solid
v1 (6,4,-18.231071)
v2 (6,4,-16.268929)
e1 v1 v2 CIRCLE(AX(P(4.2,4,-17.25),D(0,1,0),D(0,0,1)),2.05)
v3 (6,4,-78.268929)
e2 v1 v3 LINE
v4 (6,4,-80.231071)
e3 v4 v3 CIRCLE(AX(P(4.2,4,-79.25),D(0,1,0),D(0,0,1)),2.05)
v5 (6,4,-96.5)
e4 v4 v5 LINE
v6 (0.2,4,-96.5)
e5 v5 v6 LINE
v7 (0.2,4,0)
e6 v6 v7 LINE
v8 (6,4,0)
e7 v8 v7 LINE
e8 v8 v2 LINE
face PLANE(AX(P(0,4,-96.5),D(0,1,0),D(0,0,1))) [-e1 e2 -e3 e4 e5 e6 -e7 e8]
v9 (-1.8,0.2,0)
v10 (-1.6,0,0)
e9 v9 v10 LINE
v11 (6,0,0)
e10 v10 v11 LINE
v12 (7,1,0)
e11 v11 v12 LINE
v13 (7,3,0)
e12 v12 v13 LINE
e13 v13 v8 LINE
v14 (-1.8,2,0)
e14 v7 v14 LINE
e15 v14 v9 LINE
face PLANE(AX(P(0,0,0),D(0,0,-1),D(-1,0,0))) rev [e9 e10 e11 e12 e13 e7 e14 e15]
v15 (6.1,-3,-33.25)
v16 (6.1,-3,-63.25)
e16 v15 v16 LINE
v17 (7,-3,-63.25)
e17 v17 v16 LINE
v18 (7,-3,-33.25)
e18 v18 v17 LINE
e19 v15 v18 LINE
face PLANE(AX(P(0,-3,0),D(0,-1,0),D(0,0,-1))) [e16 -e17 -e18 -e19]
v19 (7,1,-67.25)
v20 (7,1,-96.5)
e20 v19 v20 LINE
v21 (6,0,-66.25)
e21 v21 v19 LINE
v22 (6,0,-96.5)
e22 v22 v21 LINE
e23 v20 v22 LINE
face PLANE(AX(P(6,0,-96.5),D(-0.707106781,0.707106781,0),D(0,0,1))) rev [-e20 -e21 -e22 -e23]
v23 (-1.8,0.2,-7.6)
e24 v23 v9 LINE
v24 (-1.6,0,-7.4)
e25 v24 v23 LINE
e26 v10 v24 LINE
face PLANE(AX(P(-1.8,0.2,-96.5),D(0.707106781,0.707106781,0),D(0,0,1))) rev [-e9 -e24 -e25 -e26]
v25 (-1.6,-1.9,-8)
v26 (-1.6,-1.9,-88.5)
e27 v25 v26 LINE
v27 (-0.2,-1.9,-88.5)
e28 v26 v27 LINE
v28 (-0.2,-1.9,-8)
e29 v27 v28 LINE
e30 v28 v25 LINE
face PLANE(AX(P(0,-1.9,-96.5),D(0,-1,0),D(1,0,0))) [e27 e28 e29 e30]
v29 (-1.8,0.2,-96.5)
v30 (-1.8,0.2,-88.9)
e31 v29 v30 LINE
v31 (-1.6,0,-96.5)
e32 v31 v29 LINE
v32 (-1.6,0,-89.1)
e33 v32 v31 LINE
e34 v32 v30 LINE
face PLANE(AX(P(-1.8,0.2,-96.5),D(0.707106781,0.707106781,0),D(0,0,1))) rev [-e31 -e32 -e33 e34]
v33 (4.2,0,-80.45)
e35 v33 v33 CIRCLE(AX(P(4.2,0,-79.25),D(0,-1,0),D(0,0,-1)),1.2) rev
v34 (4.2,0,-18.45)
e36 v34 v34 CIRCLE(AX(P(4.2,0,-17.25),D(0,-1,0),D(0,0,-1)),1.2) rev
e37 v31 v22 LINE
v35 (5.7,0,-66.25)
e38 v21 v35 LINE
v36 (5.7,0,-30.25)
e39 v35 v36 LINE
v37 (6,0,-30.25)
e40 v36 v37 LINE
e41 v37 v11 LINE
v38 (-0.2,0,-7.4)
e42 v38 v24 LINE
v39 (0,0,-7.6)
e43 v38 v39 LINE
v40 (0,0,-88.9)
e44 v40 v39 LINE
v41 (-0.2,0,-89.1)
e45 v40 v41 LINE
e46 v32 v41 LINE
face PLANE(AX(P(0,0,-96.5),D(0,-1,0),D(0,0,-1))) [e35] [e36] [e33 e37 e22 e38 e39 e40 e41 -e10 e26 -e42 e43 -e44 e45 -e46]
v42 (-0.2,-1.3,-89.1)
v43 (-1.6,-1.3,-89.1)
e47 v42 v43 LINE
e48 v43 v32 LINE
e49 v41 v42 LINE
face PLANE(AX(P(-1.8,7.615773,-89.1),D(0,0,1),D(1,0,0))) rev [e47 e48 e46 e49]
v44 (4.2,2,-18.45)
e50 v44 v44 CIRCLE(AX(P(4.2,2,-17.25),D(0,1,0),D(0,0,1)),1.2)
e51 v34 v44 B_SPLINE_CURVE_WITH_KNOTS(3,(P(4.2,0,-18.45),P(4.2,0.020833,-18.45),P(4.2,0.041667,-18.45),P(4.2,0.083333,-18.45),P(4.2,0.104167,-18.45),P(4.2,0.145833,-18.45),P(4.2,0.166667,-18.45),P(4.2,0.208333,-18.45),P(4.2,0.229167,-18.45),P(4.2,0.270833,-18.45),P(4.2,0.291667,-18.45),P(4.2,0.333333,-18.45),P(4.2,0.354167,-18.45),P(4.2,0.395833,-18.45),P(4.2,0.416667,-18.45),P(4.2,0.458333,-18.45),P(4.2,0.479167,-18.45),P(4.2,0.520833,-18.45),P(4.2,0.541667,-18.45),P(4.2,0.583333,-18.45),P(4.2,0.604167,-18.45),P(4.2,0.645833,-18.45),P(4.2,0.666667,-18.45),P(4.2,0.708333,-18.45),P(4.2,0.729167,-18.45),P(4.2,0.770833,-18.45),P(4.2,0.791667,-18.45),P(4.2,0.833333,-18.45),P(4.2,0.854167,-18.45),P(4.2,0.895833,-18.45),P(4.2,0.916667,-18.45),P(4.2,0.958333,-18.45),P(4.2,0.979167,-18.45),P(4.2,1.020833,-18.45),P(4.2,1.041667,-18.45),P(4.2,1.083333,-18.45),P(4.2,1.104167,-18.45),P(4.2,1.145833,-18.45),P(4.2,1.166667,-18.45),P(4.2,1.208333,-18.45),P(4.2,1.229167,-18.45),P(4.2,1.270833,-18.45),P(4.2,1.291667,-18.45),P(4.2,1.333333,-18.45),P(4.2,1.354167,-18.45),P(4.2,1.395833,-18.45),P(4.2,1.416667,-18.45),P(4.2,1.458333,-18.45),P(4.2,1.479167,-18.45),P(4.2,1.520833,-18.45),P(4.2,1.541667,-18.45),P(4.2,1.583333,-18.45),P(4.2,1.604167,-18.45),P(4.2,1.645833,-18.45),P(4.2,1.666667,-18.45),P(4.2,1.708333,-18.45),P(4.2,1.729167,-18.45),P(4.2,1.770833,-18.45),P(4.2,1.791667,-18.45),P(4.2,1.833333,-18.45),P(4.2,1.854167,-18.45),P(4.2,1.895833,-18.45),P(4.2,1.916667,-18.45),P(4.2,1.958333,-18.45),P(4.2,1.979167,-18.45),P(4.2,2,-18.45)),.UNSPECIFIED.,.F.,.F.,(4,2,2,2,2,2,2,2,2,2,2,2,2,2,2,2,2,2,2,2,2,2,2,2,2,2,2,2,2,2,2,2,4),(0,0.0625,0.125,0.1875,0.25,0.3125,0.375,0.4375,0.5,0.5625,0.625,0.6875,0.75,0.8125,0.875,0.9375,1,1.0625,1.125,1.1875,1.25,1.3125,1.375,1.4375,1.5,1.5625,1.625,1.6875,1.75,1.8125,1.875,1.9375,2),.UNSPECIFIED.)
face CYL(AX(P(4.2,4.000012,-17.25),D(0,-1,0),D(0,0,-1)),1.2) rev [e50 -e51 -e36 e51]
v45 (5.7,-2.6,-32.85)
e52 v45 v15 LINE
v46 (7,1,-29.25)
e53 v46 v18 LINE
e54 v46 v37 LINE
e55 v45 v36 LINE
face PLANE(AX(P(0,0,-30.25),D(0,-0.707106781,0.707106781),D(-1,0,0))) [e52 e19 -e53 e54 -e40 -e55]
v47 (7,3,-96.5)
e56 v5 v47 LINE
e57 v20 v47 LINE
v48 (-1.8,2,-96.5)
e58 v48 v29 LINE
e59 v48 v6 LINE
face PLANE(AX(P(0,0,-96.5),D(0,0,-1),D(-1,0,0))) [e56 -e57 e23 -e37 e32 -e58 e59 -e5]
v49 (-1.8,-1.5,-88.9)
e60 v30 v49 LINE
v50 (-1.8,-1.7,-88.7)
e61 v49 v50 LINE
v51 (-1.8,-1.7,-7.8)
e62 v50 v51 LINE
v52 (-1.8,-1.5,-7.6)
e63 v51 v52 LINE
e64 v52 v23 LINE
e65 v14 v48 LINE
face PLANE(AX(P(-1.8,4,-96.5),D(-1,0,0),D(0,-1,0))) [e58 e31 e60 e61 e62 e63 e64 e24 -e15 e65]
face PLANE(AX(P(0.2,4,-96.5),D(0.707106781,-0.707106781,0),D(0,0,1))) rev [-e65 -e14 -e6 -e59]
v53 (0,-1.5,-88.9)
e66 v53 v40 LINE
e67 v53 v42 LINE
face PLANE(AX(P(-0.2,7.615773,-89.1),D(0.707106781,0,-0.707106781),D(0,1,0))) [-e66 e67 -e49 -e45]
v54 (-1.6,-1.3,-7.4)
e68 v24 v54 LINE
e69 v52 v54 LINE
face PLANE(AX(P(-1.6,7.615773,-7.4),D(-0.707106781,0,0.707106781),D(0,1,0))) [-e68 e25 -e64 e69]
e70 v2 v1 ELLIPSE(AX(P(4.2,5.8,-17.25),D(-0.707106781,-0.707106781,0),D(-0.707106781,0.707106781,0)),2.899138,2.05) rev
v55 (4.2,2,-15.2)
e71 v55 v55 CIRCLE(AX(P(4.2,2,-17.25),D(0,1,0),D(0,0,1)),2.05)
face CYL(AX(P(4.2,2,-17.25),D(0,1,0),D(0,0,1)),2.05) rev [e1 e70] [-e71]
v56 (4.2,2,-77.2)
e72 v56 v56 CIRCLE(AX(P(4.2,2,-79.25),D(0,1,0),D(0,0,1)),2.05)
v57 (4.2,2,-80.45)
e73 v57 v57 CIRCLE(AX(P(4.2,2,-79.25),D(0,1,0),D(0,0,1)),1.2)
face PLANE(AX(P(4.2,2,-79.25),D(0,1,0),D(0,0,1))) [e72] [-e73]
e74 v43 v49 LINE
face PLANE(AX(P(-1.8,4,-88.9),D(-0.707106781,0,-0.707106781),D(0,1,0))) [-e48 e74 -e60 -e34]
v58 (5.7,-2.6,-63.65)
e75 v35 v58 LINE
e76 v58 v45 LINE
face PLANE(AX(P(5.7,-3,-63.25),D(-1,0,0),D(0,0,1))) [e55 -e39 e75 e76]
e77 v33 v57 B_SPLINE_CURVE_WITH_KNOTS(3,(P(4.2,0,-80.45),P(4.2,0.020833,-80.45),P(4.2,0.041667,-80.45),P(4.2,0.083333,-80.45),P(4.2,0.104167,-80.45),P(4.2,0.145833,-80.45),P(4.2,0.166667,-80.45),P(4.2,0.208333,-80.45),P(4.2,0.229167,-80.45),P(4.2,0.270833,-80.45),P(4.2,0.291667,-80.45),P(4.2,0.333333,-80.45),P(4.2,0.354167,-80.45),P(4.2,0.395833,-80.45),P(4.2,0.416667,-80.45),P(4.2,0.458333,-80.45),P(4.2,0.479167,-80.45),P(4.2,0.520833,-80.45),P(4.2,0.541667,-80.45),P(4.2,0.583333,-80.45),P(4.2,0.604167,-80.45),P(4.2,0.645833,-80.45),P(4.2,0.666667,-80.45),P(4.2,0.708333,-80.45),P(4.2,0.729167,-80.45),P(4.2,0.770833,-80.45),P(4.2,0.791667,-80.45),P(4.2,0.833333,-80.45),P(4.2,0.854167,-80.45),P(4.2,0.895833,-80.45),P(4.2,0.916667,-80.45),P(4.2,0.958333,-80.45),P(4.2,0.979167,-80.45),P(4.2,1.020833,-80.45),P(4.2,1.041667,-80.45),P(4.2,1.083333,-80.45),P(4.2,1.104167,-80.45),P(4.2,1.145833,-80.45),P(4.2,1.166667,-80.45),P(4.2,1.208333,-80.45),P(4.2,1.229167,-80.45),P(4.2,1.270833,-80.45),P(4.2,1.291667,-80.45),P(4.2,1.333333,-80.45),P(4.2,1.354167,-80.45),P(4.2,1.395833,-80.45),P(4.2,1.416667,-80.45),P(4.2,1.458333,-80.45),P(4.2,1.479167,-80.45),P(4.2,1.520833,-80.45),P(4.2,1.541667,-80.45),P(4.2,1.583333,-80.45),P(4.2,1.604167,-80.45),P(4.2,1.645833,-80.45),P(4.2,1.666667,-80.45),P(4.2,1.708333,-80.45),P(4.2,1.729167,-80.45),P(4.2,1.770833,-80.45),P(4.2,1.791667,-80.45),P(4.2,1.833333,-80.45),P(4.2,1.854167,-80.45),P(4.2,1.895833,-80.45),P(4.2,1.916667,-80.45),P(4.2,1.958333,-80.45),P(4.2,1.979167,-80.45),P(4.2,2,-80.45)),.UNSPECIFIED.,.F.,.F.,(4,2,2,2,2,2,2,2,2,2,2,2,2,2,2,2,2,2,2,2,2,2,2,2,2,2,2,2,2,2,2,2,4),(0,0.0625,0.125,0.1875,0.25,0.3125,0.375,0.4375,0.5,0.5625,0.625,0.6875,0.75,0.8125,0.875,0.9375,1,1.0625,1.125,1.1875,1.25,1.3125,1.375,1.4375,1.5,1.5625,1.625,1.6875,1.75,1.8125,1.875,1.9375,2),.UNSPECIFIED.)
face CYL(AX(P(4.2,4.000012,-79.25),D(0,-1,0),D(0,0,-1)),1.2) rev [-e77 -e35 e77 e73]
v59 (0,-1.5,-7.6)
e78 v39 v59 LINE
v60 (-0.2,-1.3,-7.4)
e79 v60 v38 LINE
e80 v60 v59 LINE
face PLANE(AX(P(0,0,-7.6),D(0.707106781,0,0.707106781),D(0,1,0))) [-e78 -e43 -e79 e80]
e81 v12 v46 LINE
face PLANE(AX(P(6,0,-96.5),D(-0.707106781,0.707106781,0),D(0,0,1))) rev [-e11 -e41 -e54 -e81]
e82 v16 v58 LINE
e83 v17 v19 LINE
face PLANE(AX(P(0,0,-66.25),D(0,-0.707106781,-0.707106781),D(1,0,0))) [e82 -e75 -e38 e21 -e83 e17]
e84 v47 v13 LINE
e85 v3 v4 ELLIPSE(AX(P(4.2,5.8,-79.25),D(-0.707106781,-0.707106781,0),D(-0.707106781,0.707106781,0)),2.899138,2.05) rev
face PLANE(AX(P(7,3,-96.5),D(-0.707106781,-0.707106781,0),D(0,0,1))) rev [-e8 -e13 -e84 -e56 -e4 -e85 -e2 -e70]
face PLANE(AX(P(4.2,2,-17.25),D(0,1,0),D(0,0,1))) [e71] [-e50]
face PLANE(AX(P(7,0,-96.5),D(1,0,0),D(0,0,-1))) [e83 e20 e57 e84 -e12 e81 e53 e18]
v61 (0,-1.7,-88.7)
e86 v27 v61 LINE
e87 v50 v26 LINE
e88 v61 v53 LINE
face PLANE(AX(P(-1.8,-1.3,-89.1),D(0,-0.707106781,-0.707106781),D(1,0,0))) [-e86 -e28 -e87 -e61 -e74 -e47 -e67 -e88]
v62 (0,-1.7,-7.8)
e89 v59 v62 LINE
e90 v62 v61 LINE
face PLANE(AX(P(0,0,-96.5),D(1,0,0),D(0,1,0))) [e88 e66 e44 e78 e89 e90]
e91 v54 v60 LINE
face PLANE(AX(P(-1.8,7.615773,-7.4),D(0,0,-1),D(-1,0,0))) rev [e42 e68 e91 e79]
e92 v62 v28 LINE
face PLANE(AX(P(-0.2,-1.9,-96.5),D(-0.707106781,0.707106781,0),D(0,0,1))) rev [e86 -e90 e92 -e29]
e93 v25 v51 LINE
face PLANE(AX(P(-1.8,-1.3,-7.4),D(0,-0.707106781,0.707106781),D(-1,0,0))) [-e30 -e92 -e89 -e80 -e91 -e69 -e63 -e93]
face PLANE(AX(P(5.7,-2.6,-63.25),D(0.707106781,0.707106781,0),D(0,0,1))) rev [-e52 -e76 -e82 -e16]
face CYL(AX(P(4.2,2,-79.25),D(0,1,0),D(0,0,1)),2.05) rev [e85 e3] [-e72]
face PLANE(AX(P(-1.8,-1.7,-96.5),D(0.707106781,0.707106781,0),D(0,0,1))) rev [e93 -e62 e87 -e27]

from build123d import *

# Parameters (mm, degrees)
EXTRUDE_1_DEPTH          = 96.5
CUT_EXTRUDE_1_DEPTH      = 97.93327602
CUT_EXTRUDE_1_DEPTH_BACK = 10
SKETCH_2_R               = 1.2
SKETCH_2_3_R             = 2.05
CUT_EXTRUDE_2_DEPTH      = 2
CHAMFER_3_SIZE           = 2
SKETCH_3_W               = 1.8
SKETCH_3_H               = 7.4
CUT_EXTRUDE_3_DEPTH      = 1.9
CHAMFER_4_SIZE           = 0.2
CHAMFER_5_SIZE           = 0.6
CHAMFER_2_SIZE           = 1
SKETCH_4_W               = 1.3
SKETCH_4_H               = 30
EXTRUDE_2_DEPTH          = 3
CHAMFER_6_SIZE           = 3
CHAMFER_1_SIZE           = 1
CHAMFER_7_SIZE           = 0.4


# Some blends are built 0.0001 mm under size
with BuildPart() as part:
    # 草图1 → 凸台-拉伸1 (new body)
    with BuildSketch(Plane.XY):
        Polygon((0, 0), (7, 0), (7, 4), (0, 4), (-1.8, 4), (-1.8, -1.9), (0, -1.9), align=None)
    extrude(amount=-EXTRUDE_1_DEPTH)

    # 草图2 → 切除-拉伸1 (cut, two sides: drawn at the far end of the back side and taken through both)
    with BuildSketch(Plane(origin=(0, 4, 0), x_dir=(1, 0, 0), z_dir=(0, 1, 0)).offset(-CUT_EXTRUDE_1_DEPTH_BACK)):
        with Locations(Location((4.2, 79.25, 0), (0, 0, 90))):
            Circle(SKETCH_2_R)
        with Locations(Location((4.2, 17.25, 0), (0, 0, 90))):
            Circle(SKETCH_2_R)
    extrude(amount=CUT_EXTRUDE_1_DEPTH + CUT_EXTRUDE_1_DEPTH_BACK, mode=Mode.SUBTRACT)

    # 草图2<3> → 切除-拉伸2 (cut)
    with BuildSketch(Plane(origin=(0, 4, 0), x_dir=(1, 0, 0), z_dir=(0, 1, 0))):
        with Locations(Location((4.2, 79.25, 0), (0, 0, 270))):
            Circle(SKETCH_2_3_R)
        with Locations(Location((4.2, 17.25, 0), (0, 0, 270))):
            Circle(SKETCH_2_3_R)
    extrude(amount=-CUT_EXTRUDE_2_DEPTH, mode=Mode.SUBTRACT)

    # 倒角3
    chamfer_3_edges = [part.edges().sort_by_distance(p)[0] for p in [
        (-1.8, 4, -48.25),
    ]]
    chamfer(chamfer_3_edges, length=CHAMFER_3_SIZE)

    # 草图3 → 切除-拉伸3 (cut)
    with BuildSketch(Plane.XZ.offset(1.9)):
        with Locations((-0.9, -92.8)):
            Rectangle(SKETCH_3_W, SKETCH_3_H)
        with Locations((-0.9, -3.7)):
            Rectangle(SKETCH_3_W, SKETCH_3_H)
    extrude(amount=-CUT_EXTRUDE_3_DEPTH, mode=Mode.SUBTRACT)

    # 倒角4
    chamfer_4_edges = [part.edges().sort_by_distance(p)[0] for p in [
        (-1.8, -1.9, -48.25),
        (0, -1.9, -48.25),
        (-1.8, -0.95, -89.1),
        (0, -0.95, -89.1),
        (-1.8, 0, -92.8),
        (-1.8, -0.95, -7.4),
        (0, -0.95, -7.4),
        (-1.8, 0, -3.7),
    ]]
    chamfer(chamfer_4_edges, length=CHAMFER_4_SIZE)

    # 倒角5
    # the kernel refuses this chamfer: 0.6 mm, written as the material it takes off along each edge
    with BuildSketch(Plane(origin=(1.343009793, -1.9, -89.1), x_dir=(0, 0.9996219169112965, -0.027495876610595982), z_dir=(-1, 0, 0))) as chamfer_5_piece_1:
        Polygon((CHAMFER_5_SIZE * 0.999621916911, -CHAMFER_5_SIZE * 0.0274958766106), (-CHAMFER_5_SIZE * 0.0274958766106, -CHAMFER_5_SIZE * 0.999621916911), (0, 0), align=None)
    extrude(amount=4.486019586, mode=Mode.SUBTRACT)
    with BuildSketch(Plane(origin=(1.343009793, -1.9, -7.4), x_dir=(0, 0.9996219169112968, 0.027495876610585925), z_dir=(-1, 0, 0))) as chamfer_5_piece_2:
        Polygon((CHAMFER_5_SIZE * 0.999621916911, CHAMFER_5_SIZE * 0.0274958766106), (-CHAMFER_5_SIZE * 0.0274958766106, CHAMFER_5_SIZE * 0.999621916911), (0, 0), align=None)
    extrude(amount=4.486019586, mode=Mode.SUBTRACT)

    # 倒角2
    # the kernel refuses this chamfer: 1 mm, written as the material it takes off along each edge
    with BuildSketch(Plane(origin=(7, 4, 2.571682988), x_dir=(-0.9996219169112968, 0.027495876610586487, 0), z_dir=(0, 0, -1))) as chamfer_2_piece_1:
        Polygon((CHAMFER_2_SIZE * 0.999621916911, -CHAMFER_2_SIZE * 0.0274958766106), (-CHAMFER_2_SIZE * 0.0274958766106, -CHAMFER_2_SIZE * 0.999621916911), (0, 0), align=None)
    extrude(amount=101.643365976, mode=Mode.SUBTRACT)

    # 草图4 → 凸台-拉伸2 (add)
    with BuildSketch(Plane(origin=(0, 0, 0), x_dir=(1, 0, 0), z_dir=(0, 1, 0))):
        with Locations((6.35, 48.25)):
            Rectangle(SKETCH_4_W, SKETCH_4_H)
    extrude(amount=-EXTRUDE_2_DEPTH)

    # 倒角6
    chamfer_6_edges = [part.edges().sort_by_distance(p)[0] for p in [
        (6.35, 0, -33.25),
        (6.35, 0, -63.25),
    ]]
    chamfer(chamfer_6_edges, length=CHAMFER_6_SIZE - 0.0001)  # a hair under: the kernel refuses the full size

    # 倒角1
    chamfer_1_edges = [part.edges().sort_by_distance(p)[0] for p in [
        (7, 0, -81.37495),
        (7, 0, -15.12505),
    ]]
    chamfer(chamfer_1_edges, length=CHAMFER_1_SIZE)

    # 倒角7
    chamfer_7_edges = [part.edges().sort_by_distance(p)[0] for p in [
        (5.7, -3, -48.25),
    ]]
    chamfer(chamfer_7_edges, length=CHAMFER_7_SIZE)


solid = part.part
